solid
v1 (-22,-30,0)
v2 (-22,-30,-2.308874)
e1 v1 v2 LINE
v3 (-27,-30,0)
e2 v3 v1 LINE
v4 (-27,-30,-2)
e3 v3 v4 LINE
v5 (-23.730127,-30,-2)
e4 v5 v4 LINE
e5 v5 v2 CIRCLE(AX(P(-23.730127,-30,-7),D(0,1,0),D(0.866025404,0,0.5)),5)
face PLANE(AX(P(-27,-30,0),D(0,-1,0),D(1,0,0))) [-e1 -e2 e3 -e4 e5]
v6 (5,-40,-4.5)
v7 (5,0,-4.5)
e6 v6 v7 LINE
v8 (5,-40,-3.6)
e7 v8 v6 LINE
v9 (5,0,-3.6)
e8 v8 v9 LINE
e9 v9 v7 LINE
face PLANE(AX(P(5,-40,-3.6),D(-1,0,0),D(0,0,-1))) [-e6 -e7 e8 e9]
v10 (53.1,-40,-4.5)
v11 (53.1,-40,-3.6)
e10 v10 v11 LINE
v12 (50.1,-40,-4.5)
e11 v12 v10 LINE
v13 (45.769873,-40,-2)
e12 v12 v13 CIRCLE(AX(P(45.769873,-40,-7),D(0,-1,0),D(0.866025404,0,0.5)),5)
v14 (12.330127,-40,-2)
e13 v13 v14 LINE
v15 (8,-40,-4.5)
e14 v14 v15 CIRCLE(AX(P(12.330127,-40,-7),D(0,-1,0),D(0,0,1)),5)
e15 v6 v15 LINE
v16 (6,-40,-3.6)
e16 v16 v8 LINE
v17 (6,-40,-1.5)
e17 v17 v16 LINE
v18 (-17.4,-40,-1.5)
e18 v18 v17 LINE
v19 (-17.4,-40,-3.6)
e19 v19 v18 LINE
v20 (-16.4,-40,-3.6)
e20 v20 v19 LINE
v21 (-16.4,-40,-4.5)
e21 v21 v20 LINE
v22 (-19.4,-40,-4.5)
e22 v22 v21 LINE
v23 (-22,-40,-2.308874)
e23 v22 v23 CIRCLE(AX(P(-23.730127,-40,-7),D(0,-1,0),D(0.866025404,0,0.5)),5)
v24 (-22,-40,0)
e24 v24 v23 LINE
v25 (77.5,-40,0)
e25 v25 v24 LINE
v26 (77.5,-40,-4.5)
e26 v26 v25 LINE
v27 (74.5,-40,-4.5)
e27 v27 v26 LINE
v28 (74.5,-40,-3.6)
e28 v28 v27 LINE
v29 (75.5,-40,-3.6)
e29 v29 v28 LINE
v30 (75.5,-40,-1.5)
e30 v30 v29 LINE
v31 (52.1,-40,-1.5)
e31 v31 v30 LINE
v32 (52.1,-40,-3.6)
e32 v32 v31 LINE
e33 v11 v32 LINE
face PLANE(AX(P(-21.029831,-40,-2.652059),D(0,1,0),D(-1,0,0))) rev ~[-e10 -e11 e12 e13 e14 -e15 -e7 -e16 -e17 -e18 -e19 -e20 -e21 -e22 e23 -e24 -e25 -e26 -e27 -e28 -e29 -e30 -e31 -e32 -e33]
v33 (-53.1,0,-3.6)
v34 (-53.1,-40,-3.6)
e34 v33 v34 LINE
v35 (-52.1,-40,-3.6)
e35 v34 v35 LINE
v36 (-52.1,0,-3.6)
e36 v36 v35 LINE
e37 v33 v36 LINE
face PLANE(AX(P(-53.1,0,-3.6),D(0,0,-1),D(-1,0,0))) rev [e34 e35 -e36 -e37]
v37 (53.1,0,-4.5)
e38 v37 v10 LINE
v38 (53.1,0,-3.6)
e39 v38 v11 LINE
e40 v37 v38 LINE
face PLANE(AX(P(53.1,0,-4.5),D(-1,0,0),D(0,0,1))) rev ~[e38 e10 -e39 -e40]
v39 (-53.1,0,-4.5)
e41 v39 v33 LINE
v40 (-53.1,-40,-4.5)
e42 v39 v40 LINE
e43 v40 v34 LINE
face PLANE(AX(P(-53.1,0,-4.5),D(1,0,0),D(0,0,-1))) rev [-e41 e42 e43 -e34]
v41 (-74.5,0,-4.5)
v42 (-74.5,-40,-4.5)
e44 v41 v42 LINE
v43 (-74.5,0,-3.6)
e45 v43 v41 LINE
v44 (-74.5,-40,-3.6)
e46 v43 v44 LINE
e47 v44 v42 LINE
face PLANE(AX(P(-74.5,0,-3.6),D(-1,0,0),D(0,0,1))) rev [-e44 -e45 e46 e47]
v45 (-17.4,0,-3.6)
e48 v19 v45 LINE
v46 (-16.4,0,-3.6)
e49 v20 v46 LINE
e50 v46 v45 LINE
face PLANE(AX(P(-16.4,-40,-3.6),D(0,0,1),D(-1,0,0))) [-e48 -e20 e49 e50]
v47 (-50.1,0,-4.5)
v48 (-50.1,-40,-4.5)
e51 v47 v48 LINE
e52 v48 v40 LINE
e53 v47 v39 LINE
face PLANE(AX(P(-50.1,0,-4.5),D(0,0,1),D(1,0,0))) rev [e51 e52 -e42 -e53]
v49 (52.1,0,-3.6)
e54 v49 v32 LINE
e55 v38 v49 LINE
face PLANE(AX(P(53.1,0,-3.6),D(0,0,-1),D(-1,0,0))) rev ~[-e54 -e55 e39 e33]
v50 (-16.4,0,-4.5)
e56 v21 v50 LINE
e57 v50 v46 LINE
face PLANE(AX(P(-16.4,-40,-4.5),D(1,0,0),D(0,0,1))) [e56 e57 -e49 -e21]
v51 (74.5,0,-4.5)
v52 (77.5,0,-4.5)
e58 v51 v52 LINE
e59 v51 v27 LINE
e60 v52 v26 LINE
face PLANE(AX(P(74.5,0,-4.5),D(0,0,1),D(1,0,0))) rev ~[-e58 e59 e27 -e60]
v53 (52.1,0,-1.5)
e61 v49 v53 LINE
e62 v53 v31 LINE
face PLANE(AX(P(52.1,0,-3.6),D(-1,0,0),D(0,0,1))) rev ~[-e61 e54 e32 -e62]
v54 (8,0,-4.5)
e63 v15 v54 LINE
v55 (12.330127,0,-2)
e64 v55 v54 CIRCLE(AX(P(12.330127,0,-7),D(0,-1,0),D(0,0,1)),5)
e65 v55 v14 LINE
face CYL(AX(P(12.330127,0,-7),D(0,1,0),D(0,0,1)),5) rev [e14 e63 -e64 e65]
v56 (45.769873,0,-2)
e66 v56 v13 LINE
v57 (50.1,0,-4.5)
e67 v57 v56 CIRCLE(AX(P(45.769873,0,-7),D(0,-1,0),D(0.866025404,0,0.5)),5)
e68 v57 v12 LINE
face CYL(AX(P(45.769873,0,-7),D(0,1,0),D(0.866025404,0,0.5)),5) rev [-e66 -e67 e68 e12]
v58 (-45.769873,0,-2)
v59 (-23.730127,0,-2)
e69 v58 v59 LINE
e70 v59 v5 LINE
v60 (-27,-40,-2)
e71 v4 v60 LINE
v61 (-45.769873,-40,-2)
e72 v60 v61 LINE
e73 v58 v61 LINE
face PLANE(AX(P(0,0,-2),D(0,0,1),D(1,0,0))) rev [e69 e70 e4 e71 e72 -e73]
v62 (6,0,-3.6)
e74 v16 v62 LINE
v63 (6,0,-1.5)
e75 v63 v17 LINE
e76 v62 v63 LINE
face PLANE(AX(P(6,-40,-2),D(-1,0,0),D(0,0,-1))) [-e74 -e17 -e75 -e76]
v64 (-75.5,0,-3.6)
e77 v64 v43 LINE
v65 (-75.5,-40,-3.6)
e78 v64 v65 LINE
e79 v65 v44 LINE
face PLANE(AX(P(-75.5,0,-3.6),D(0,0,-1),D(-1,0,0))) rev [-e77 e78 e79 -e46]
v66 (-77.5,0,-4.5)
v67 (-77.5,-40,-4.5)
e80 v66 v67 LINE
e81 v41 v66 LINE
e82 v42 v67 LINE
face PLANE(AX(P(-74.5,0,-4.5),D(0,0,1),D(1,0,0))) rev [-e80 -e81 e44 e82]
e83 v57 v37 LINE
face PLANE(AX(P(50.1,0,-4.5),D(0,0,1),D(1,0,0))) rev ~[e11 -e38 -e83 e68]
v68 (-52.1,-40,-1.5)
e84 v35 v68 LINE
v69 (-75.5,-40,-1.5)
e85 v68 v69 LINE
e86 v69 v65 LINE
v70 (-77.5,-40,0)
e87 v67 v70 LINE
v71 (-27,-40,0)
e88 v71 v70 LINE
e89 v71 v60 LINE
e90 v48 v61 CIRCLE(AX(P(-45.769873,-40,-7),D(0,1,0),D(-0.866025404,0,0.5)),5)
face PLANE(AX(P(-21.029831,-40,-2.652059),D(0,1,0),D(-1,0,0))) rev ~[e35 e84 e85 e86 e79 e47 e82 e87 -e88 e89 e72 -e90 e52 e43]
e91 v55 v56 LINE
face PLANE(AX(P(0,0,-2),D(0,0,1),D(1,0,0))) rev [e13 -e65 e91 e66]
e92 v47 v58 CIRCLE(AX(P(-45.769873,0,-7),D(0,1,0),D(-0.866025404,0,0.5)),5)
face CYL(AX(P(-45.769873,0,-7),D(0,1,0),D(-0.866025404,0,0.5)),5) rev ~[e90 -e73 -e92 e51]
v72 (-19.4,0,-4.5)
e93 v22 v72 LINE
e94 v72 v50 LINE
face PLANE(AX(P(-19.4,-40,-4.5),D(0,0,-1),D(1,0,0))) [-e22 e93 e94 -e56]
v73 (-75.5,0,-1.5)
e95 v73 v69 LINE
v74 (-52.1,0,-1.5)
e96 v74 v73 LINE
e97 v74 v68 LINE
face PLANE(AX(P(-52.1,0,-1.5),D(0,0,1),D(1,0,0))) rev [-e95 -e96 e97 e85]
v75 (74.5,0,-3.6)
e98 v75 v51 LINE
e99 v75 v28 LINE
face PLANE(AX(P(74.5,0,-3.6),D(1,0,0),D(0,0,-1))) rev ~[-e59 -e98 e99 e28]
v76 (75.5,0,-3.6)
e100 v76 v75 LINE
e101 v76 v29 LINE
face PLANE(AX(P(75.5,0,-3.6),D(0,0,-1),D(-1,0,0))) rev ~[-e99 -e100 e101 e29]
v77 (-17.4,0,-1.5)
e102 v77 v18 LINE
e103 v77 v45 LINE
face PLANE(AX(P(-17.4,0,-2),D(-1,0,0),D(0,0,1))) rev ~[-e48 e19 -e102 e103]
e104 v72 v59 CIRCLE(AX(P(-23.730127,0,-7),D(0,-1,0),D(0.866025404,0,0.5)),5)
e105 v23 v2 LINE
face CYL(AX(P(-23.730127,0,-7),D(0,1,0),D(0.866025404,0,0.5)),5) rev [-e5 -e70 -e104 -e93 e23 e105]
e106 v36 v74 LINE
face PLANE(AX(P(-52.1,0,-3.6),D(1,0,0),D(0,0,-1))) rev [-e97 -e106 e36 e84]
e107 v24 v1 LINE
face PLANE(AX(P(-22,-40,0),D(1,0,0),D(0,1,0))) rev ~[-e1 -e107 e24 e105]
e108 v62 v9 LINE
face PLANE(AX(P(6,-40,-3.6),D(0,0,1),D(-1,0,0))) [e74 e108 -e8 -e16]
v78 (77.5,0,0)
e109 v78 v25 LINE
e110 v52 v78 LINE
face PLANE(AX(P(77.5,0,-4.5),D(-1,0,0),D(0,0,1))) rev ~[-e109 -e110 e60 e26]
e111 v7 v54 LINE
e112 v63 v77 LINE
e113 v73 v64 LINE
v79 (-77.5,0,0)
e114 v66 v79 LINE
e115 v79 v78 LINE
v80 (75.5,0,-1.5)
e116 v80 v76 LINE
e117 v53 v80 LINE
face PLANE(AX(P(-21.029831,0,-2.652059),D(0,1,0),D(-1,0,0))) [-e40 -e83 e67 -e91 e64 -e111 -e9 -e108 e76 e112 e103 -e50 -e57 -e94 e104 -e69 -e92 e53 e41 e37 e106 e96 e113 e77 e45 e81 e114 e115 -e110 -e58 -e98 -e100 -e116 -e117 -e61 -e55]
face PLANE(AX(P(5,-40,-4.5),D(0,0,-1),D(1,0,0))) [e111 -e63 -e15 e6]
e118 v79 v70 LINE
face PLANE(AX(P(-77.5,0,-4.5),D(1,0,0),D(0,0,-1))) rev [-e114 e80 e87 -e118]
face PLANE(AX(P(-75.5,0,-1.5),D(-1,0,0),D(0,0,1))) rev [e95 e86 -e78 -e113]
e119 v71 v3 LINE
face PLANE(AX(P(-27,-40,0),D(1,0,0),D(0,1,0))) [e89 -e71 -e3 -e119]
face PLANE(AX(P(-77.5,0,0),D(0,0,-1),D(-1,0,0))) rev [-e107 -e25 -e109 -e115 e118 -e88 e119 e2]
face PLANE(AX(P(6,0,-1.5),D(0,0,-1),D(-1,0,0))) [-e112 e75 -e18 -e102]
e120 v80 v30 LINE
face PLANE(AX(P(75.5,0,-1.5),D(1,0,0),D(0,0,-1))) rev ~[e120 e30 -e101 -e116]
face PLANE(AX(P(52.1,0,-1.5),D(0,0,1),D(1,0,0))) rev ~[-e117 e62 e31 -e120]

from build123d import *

# Parameters (mm, degrees)
F1_DEPTH       = 40
F2_T1_DEPTH    = 40
F5_DEPTH       = 40
F6_W           = 23.4
F6_H           = 0.5
F7_DEPTH       = 40.001
F8_T1_DEPTH    = 40
F9_W           = 5
F9_H           = 10
F10_DEPTH      = 181
F10_DEPTH_BACK = 4.501


# Not quite as in the source:
# - a fillet or chamfer that OpenCascade refuses, or shapes differently, is made with other operations: its cross-section is extruded or revolved along the edge and cut away or added
# - an extrude ends at something that could not be found from the text; its depth is read off the source's solid


with BuildPart() as f1:
    # F0 (on Front) → F1 (new body)
    with BuildSketch(Plane.XZ):
        Polygon((77.5, 0), (0, 0), (0, -2), (50.1, -2), (50.1, -4.5), (53.1, -4.5), (53.1, -3.6), (52.1, -3.6), (52.1, -2), (52.1, -1.5), (75.5, -1.5), (75.5, -2), (75.5, -3.6), (74.5, -3.6), (74.5, -4.5), (77.5, -4.5), (77.5, -2), align=None)
    extrude(amount=F1_DEPTH)

    # F2: fillet of radius 5 on 1 edges, made by hand

    # F2_s2 → F2_t1 (join)
    with BuildSketch(Plane.XZ):
        with BuildLine():
            ThreePointArc((50.1, -4.5), (48.2698729811, -2.6698729811), (45.7698729811, -2))
            Line((45.7698729811, -2), (50.1, -2))
            Line((50.1, -2), (50.1, -4.5))
        make_face()
    extrude(amount=F2_T1_DEPTH)

    # F3: F1 across plane


with BuildPart() as f1_1:
    add(f1.part)
    add(f1.part.mirror(Plane.YZ))

    # F4 (on face) → F5 (join, through all)
    with BuildSketch(Plane.XZ.offset(40)):
        Polygon((-17.4, -3.6), (-17.4, -2), (-19.4, -2), (-19.4, -4.5), (-17.4, -4.5), (-16.4, -4.5), (-16.4, -3.6), align=None)
        Polygon((8, -2), (6, -2), (6, -3.6), (5, -3.6), (5, -4.5), (6, -4.5), (8, -4.5), align=None)
    extrude(amount=-F5_DEPTH)

    # F6 (on face) → F7 (cut, through all)
    with BuildSketch(Plane(origin=(0, 0, 0), x_dir=(-1, 0, 0), z_dir=(0, 1, 0))):
        with Locations((5.7, -1.75)):
            Rectangle(F6_W, F6_H)
    extrude(amount=-F7_DEPTH, mode=Mode.SUBTRACT)

    # F8: fillet of radius 5 on 2 edges, made by hand

    # F8_s2 → F8_t1 (join)
    with BuildSketch(Plane.XZ):
        with BuildLine():
            ThreePointArc((-19.4, -4.5), (-21.2301270189, -2.6698729811), (-23.7301270189, -2))
            Line((-23.7301270189, -2), (-19.4, -2))
            Line((-19.4, -2), (-19.4, -4.5))
        make_face()
        with BuildLine():
            ThreePointArc((12.3301270189, -2), (9.8301270189, -2.6698729811), (8, -4.5))
            Line((8, -4.5), (8, -2))
            Line((8, -2), (12.3301270189, -2))
        make_face()
    extrude(amount=F8_T1_DEPTH)

    # F9 (on Top) → F10 (cut, two sides)
    with BuildSketch(Plane.XY) as f10_sk:
        with Locations((-24.5, -35)):
            Rectangle(F9_W, F9_H)
    extrude(amount=F10_DEPTH, mode=Mode.SUBTRACT)
    extrude(f10_sk.sketch, amount=-F10_DEPTH_BACK, mode=Mode.SUBTRACT)


solid = f1_1.part
